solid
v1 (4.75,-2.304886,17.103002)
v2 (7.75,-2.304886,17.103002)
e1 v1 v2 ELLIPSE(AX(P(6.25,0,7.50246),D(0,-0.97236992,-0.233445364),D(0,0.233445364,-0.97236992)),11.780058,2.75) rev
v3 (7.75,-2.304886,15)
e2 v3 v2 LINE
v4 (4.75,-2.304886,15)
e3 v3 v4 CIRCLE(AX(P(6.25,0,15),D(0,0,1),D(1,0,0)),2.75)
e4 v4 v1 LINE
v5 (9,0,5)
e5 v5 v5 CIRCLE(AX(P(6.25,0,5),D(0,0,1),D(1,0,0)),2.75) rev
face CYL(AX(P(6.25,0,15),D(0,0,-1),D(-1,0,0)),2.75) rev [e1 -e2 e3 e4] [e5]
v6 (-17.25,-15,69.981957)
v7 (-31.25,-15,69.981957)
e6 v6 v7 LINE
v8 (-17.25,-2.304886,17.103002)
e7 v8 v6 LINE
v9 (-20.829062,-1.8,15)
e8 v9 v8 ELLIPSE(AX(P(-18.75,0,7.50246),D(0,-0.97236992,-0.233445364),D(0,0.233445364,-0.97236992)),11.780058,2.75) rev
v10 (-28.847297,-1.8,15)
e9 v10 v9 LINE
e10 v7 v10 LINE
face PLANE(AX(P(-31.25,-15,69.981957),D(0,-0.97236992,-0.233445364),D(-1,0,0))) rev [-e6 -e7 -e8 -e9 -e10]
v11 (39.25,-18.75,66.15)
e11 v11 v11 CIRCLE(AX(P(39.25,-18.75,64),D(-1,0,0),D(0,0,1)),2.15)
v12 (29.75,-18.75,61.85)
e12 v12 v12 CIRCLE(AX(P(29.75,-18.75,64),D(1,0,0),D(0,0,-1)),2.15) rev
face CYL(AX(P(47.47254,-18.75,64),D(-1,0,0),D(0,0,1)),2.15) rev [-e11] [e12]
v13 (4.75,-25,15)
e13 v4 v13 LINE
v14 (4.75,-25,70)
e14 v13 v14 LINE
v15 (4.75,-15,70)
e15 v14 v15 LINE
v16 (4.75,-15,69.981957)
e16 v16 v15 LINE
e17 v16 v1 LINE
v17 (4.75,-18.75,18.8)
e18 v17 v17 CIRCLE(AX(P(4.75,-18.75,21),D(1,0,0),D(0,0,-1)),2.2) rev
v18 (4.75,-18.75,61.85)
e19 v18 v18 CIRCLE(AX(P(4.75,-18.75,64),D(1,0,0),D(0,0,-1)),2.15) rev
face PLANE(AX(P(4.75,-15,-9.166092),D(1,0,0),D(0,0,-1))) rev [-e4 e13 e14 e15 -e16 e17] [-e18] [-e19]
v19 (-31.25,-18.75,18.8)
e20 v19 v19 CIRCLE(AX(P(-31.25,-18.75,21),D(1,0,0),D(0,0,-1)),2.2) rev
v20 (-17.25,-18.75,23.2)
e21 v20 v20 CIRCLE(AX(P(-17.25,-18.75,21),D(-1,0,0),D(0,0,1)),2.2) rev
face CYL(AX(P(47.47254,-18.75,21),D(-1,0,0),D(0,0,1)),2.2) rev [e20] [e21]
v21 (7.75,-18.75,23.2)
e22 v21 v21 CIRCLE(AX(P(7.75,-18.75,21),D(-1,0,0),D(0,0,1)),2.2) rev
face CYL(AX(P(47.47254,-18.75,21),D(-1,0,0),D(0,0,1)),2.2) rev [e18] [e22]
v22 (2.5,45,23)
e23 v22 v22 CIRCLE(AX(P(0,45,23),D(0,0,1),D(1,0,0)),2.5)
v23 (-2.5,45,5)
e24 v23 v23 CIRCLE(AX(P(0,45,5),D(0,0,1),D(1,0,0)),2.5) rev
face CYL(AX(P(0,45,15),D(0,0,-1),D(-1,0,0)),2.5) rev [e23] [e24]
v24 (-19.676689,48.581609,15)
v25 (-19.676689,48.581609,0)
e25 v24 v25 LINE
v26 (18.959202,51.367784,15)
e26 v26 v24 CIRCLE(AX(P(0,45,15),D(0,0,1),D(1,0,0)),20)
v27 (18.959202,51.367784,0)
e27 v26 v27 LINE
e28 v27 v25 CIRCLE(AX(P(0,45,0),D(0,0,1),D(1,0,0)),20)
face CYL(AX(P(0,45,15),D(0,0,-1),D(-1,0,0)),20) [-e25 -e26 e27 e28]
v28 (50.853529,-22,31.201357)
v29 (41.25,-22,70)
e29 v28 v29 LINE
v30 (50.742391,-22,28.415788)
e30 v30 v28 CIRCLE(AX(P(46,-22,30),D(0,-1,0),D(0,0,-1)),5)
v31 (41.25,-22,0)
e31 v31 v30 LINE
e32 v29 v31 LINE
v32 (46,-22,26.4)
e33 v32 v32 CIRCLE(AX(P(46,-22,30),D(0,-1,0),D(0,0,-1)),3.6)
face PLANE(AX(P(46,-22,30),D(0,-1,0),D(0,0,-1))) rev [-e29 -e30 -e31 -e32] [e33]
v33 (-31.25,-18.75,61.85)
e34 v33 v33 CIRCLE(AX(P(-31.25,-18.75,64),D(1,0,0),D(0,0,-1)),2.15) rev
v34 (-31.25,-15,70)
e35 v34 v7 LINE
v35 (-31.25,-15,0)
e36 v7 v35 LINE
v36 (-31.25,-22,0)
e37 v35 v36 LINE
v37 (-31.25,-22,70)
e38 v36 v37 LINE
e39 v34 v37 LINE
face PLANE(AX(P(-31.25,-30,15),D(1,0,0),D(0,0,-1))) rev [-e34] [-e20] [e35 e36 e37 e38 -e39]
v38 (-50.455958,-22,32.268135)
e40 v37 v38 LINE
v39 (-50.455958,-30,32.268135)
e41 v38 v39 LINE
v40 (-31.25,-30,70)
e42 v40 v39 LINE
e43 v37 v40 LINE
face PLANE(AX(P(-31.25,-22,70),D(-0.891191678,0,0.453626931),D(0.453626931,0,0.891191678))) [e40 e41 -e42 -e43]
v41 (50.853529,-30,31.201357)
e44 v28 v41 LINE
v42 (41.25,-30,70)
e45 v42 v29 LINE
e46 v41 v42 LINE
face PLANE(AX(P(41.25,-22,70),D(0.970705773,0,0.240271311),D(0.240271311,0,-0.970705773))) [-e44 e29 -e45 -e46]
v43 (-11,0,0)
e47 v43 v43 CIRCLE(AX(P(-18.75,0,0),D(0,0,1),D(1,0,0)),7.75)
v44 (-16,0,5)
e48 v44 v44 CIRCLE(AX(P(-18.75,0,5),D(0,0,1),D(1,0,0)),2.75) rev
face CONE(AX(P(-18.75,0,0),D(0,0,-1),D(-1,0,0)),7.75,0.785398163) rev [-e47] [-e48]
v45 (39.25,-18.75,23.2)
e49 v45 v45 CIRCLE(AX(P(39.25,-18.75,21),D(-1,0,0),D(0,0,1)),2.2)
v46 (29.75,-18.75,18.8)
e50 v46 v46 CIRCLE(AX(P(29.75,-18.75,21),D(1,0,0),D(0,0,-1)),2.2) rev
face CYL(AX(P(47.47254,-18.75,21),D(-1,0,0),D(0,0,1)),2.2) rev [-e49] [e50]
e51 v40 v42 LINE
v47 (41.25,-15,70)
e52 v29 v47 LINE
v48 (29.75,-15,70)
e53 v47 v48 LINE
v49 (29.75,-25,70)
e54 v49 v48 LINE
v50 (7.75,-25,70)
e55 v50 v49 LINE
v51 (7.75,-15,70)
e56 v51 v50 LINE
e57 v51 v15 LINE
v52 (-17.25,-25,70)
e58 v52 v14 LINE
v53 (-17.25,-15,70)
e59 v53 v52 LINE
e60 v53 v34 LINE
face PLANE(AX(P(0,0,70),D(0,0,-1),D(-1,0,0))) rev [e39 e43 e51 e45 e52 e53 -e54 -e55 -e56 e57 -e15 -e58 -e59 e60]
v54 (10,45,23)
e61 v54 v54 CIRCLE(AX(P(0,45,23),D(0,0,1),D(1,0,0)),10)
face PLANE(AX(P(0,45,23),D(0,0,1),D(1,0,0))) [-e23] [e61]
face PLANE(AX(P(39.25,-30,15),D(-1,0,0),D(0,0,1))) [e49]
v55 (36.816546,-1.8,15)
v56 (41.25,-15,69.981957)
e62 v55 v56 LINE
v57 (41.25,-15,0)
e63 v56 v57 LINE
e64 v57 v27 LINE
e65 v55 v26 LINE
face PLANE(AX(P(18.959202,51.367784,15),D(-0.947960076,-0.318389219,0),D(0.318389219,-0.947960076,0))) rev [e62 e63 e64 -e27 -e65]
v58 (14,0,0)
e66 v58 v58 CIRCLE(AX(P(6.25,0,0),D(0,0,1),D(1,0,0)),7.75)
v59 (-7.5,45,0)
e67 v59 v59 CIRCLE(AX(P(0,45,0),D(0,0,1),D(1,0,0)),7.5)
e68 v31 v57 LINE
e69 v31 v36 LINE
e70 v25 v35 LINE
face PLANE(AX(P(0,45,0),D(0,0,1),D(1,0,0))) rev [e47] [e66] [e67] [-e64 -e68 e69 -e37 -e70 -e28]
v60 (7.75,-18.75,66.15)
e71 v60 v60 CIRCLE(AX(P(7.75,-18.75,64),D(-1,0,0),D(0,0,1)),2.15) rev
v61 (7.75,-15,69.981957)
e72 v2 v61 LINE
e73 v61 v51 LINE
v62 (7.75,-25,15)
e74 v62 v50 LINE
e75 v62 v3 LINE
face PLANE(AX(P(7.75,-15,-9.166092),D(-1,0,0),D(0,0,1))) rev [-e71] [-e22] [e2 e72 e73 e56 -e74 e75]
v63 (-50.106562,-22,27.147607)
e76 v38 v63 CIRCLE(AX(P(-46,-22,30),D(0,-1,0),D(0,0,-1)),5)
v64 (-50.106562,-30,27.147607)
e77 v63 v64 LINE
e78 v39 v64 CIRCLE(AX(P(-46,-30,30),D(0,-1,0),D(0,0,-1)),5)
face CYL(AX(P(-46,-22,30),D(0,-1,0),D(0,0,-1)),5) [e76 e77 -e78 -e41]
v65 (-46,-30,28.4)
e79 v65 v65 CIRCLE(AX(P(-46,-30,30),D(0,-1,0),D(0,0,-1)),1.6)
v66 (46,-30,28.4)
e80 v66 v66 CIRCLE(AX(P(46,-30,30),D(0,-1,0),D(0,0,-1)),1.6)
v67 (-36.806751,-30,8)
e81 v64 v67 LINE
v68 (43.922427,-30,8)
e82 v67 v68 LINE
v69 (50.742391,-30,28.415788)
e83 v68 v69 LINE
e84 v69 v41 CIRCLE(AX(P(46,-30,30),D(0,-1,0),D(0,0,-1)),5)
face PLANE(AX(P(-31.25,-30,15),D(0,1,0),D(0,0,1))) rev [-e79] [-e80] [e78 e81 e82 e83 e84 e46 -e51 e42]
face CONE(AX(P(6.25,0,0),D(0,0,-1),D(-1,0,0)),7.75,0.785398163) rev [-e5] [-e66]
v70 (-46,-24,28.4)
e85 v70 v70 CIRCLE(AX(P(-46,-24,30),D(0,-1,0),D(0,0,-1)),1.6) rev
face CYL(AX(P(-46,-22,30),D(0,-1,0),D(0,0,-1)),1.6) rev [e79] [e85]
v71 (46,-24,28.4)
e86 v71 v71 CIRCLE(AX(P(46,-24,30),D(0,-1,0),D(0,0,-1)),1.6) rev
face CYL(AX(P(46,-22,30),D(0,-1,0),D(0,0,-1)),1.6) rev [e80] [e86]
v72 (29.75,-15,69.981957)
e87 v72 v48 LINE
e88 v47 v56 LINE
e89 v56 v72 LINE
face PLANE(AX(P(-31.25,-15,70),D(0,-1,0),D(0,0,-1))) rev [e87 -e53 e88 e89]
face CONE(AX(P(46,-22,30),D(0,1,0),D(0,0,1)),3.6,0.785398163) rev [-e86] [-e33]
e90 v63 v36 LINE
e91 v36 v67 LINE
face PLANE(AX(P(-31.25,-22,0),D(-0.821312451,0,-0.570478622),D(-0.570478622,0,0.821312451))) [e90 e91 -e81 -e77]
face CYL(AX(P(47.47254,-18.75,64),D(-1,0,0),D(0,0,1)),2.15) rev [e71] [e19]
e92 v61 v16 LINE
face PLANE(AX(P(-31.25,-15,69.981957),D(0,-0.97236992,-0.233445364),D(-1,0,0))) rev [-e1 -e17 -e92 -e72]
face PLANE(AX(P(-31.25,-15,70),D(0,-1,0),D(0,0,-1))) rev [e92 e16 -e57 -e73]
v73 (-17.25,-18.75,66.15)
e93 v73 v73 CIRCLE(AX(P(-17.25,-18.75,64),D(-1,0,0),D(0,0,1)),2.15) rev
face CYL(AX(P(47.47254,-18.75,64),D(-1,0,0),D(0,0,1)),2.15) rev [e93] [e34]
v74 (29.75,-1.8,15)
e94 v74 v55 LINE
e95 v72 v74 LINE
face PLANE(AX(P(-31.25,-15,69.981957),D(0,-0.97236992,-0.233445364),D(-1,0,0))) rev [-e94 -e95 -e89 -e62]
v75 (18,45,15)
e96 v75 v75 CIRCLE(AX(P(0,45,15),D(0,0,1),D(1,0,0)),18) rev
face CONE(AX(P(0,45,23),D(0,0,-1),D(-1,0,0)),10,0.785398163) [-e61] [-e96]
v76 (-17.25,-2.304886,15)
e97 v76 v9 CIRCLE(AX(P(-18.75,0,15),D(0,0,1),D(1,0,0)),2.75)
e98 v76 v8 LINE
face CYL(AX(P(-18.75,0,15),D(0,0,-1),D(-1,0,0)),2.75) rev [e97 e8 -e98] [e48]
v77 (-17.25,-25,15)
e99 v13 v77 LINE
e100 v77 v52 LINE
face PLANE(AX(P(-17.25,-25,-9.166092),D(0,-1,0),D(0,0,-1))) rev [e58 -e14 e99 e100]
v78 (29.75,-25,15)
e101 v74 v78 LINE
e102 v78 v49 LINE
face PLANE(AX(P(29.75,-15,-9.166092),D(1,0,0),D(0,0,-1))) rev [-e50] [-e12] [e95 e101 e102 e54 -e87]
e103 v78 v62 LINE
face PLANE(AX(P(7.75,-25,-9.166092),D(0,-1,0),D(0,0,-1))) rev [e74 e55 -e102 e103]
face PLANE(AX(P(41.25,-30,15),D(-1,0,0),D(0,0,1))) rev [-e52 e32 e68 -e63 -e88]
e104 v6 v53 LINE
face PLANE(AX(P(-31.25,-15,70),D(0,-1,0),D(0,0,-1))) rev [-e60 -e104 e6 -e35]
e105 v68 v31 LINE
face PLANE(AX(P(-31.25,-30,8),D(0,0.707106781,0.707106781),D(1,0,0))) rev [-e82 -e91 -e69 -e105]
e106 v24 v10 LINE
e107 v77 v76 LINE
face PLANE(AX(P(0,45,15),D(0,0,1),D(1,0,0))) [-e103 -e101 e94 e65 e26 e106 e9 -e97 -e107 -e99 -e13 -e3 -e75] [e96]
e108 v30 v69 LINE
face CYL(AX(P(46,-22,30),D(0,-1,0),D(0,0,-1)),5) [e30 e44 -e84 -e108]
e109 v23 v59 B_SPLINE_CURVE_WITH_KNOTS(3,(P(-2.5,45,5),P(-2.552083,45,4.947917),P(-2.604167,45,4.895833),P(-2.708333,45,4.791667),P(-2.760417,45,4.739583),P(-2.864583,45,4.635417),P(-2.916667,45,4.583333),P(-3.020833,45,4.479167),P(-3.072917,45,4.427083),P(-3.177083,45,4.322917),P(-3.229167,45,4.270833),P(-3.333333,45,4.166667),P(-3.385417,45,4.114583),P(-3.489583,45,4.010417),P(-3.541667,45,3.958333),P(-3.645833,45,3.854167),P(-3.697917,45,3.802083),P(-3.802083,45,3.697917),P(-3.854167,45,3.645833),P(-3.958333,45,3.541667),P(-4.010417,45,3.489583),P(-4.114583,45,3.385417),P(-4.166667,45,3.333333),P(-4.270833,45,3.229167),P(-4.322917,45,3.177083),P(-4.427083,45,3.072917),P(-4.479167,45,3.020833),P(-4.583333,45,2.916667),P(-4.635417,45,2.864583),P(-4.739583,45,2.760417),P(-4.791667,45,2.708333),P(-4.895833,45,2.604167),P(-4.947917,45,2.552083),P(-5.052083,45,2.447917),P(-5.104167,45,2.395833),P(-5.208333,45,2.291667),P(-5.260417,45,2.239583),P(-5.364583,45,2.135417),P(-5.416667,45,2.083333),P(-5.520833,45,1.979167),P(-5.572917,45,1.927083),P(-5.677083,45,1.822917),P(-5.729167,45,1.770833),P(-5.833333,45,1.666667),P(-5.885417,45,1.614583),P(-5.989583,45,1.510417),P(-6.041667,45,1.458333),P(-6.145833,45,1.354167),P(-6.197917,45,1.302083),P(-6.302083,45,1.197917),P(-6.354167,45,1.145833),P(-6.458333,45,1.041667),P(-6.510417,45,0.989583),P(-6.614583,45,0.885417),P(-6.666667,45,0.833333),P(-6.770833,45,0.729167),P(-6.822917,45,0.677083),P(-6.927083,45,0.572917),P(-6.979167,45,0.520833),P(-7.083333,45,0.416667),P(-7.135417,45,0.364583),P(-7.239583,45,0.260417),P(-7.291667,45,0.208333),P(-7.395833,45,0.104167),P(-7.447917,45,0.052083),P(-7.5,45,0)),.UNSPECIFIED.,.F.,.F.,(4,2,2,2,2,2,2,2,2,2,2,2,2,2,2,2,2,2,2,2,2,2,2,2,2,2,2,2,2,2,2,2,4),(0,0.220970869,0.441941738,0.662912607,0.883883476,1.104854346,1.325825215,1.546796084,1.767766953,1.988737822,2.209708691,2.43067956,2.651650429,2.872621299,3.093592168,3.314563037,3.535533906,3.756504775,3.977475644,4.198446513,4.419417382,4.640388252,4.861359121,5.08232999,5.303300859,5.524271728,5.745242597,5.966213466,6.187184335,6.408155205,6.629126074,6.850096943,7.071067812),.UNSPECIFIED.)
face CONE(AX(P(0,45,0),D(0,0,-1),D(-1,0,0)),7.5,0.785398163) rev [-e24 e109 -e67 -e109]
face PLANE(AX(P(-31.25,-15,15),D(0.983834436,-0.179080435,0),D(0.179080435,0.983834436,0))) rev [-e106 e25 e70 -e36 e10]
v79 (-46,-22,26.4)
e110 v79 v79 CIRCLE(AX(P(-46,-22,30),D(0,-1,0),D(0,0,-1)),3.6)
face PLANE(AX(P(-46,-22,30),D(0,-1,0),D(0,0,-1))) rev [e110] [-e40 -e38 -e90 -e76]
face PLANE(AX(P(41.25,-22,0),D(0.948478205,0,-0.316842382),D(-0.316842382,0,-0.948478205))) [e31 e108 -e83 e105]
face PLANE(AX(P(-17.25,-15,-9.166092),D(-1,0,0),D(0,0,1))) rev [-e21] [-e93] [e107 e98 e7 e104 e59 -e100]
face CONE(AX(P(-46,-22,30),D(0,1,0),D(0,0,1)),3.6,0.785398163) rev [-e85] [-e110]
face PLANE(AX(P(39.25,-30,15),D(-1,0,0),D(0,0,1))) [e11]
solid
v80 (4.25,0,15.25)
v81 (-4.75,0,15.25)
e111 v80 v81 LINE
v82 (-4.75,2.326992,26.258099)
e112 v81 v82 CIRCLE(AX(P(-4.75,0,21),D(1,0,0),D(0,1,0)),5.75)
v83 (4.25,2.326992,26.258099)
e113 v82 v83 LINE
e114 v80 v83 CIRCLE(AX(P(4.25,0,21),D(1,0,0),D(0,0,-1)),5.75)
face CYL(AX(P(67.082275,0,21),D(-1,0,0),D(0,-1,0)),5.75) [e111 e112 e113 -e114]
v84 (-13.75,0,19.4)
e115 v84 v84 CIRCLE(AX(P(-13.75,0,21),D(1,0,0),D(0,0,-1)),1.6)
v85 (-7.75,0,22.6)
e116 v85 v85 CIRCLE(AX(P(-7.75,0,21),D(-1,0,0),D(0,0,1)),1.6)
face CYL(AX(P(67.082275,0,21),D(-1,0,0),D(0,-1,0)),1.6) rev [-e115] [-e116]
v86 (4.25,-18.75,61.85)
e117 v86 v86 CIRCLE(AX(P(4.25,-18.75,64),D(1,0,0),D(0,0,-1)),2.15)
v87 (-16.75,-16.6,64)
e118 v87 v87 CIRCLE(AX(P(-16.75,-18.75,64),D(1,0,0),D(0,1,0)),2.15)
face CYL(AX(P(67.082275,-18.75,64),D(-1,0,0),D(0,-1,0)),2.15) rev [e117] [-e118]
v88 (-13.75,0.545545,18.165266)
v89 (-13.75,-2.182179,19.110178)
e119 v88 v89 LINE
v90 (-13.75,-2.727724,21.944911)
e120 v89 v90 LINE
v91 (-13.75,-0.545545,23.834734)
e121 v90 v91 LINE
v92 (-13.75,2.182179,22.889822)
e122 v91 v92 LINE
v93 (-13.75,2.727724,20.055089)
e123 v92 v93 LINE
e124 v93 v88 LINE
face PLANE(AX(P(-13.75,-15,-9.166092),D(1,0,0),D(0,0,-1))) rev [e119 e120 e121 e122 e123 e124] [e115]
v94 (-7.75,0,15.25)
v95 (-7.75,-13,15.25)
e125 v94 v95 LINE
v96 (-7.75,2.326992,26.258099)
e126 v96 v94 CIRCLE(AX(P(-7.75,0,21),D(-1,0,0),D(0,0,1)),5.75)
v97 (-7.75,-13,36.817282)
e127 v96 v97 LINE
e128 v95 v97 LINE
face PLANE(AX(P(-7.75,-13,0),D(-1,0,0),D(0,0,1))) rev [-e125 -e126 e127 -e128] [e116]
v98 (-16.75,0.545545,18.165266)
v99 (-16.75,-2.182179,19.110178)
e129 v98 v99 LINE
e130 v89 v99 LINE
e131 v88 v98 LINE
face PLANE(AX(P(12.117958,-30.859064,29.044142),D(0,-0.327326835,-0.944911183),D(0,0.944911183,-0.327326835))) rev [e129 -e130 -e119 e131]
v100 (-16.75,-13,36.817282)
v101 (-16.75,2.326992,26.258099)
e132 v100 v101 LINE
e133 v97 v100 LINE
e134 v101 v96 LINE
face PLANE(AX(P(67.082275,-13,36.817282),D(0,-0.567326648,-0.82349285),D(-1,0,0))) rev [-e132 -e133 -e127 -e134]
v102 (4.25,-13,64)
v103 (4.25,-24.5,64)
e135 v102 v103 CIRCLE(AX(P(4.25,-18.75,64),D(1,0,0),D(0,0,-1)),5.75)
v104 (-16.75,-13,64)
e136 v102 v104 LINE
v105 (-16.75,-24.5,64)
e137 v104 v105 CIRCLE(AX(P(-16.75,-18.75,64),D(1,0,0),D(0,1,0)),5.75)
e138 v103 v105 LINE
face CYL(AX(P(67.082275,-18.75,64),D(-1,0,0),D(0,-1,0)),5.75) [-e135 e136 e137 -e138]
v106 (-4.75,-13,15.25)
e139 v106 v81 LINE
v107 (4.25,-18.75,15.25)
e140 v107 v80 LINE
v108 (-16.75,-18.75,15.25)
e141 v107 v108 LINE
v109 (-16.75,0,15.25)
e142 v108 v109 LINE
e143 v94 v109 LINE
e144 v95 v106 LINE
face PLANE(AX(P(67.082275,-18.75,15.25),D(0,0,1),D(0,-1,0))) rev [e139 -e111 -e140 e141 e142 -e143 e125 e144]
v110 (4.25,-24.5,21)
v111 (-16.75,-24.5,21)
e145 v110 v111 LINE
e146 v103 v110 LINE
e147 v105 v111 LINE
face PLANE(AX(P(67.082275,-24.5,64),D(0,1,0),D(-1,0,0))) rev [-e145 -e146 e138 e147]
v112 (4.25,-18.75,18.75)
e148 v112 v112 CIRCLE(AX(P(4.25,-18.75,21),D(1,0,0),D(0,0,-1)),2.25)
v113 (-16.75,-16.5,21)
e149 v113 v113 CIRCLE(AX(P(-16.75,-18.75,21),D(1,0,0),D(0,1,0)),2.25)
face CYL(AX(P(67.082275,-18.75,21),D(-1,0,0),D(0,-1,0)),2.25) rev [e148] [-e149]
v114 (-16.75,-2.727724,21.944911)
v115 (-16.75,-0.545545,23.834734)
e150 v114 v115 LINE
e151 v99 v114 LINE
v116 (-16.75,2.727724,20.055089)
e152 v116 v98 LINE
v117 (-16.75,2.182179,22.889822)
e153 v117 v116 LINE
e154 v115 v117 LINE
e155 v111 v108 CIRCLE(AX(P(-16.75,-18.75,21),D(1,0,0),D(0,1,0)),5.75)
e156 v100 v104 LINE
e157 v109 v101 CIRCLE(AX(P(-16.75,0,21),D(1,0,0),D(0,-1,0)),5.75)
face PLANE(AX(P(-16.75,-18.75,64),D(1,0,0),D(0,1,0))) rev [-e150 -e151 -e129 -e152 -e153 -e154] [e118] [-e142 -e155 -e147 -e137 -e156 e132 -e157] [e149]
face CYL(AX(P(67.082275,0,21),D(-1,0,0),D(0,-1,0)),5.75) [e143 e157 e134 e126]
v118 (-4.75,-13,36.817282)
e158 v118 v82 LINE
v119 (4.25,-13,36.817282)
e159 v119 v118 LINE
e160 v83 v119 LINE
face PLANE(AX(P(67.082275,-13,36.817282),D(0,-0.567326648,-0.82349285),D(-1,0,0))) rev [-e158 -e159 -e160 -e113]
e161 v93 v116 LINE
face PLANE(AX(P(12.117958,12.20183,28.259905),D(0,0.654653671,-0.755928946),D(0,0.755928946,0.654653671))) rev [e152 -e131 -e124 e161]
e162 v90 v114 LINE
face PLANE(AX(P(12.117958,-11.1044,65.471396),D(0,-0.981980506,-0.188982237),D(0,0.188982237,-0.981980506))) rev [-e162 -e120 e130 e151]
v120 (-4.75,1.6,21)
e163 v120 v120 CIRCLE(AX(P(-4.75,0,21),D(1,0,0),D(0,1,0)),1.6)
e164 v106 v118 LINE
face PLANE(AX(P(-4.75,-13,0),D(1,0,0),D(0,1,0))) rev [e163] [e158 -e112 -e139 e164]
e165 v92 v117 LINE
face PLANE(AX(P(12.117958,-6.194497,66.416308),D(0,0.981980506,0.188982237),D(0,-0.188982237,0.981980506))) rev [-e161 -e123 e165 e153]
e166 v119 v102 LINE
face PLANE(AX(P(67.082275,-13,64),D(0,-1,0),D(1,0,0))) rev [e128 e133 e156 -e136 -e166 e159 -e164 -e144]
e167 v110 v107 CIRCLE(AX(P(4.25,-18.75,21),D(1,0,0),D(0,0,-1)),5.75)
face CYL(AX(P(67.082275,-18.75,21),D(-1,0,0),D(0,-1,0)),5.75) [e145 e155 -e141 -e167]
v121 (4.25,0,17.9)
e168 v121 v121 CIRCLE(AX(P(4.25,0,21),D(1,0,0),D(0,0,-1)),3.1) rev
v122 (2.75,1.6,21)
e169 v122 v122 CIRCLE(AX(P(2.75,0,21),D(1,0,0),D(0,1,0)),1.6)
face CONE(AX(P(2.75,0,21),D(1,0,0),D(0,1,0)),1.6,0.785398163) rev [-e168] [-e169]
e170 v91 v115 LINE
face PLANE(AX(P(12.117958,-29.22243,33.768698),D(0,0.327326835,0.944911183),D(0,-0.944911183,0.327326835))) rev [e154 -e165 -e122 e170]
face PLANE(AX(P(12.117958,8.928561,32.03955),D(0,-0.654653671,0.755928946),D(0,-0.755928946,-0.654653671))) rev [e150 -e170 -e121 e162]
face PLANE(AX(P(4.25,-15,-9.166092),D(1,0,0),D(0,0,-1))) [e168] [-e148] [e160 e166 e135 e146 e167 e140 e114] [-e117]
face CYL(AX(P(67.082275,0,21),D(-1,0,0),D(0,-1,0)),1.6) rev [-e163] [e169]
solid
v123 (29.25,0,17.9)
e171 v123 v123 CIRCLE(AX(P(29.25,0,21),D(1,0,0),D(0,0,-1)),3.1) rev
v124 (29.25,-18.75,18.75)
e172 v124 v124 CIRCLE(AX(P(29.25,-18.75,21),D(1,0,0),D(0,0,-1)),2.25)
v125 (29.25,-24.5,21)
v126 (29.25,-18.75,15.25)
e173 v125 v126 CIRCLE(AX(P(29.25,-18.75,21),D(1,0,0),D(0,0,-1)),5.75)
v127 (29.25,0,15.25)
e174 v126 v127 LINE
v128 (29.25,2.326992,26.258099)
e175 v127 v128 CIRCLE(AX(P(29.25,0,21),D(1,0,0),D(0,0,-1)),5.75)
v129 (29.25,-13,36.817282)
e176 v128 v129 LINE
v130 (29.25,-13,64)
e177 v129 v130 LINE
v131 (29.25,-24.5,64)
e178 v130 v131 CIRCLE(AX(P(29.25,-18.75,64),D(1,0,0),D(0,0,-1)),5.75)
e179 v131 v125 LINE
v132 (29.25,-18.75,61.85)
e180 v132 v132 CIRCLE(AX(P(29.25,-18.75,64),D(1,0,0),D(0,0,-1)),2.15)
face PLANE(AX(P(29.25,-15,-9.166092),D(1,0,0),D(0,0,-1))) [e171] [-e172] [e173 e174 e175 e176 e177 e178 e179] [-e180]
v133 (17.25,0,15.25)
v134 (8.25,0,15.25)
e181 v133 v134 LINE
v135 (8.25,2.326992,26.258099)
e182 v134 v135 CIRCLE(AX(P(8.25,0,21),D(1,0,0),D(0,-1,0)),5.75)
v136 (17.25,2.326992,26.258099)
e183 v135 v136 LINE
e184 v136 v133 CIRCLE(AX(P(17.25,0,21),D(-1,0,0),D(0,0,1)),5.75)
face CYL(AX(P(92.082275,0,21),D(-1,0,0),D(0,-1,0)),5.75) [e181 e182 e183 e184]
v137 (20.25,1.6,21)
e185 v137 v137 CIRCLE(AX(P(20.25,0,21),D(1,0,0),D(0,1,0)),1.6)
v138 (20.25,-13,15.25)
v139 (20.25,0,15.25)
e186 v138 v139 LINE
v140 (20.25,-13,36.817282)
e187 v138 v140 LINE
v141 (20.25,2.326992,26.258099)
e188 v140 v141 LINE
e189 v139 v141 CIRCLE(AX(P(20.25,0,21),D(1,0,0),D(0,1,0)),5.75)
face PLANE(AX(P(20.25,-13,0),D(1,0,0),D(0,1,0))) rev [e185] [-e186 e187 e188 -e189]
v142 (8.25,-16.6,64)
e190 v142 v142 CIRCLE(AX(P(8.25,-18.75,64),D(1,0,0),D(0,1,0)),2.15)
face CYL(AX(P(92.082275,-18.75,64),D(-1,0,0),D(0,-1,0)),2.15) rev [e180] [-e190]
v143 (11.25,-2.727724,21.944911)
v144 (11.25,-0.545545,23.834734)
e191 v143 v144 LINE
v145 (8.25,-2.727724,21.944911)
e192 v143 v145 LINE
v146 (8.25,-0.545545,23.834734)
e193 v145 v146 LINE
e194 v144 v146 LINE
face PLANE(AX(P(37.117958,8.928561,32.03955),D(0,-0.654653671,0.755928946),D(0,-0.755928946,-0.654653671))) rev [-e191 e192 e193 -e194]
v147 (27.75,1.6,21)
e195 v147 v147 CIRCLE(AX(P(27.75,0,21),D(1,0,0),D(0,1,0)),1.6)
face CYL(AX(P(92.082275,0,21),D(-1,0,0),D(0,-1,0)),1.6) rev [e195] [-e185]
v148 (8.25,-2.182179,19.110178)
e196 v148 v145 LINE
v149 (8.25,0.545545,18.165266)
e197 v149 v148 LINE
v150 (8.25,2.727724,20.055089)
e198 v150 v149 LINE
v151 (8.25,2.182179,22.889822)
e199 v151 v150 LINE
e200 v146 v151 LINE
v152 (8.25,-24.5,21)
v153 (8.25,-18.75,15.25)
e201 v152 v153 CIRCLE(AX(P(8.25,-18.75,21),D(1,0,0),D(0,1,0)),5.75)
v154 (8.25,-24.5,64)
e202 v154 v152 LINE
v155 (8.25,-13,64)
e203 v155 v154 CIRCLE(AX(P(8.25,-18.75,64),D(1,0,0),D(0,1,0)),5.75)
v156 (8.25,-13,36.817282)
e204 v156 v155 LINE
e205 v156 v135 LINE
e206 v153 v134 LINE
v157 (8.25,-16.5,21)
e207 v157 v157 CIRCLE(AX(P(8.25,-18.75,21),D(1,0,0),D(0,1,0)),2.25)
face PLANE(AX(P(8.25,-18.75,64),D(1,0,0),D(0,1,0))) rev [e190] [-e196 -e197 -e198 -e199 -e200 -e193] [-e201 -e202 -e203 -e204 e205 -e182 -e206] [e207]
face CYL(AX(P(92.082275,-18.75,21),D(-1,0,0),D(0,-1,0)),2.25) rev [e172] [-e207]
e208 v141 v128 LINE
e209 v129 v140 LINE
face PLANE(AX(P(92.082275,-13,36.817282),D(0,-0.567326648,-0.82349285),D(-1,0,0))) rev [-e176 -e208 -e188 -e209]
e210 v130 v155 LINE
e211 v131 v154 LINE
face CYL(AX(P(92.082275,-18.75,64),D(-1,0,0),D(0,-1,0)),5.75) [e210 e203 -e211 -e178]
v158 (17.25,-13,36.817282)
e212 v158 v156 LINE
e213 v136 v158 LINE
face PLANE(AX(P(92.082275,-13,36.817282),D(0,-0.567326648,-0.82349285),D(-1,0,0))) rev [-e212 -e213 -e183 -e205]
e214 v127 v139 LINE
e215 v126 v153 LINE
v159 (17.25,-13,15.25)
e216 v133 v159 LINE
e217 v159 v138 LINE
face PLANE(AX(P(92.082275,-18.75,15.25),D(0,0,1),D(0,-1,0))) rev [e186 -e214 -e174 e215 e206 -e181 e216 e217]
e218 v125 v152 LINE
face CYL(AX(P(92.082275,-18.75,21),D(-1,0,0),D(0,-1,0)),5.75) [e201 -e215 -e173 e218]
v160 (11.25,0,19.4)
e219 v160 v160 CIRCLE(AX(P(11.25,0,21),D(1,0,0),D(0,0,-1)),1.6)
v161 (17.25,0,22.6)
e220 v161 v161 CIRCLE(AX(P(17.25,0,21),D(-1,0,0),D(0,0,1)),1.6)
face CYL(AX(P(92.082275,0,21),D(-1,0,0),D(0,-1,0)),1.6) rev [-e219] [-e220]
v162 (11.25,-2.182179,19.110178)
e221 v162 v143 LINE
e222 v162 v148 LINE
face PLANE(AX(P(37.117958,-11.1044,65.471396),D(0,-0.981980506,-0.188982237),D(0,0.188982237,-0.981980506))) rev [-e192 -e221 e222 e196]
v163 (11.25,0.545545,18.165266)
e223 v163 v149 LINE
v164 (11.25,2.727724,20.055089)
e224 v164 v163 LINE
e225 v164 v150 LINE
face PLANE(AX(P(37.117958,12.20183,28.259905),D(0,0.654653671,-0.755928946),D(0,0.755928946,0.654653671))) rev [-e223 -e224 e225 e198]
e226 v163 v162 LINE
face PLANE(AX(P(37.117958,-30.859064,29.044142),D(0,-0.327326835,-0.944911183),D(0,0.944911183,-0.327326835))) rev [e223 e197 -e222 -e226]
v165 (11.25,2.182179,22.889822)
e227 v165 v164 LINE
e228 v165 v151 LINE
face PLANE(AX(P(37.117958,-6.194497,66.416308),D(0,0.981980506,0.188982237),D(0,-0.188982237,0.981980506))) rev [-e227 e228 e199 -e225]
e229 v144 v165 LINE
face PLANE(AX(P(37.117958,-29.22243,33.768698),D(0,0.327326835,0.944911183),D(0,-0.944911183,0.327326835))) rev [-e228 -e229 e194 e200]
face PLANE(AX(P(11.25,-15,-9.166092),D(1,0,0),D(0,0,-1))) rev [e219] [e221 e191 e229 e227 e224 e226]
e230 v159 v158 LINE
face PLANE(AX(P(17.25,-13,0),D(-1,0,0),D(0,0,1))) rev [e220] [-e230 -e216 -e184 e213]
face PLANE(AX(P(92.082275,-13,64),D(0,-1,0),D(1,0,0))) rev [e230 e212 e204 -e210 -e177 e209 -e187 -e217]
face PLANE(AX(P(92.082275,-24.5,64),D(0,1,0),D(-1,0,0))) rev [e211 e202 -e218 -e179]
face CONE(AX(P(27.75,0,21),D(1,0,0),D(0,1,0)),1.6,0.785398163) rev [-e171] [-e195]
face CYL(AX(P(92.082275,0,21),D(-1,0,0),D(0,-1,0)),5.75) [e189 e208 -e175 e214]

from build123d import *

# Parameters (mm, degrees)
SKETCH2_R               = 2.75
SKETCH2_R_2             = 2.5
BOSS_EXTRUDE1_DEPTH     = 15
SKETCH8_W               = 72.5
SKETCH8_H               = 15
BOSS_EXTRUDE4_DEPTH     = 55
SKETCH9_W               = 22
SKETCH9_H               = 10
CUT_EXTRUDE3_DEPTH      = 55
CUT_EXTRUDE4_START      = -72.5
SKETCH10_R              = 2.15
SKETCH10_R_2            = 2.2
CUT_EXTRUDE4_DEPTH      = 70.5
BOSS_EXTRUDE5_START     = 0.5
SKETCH11_R              = 1.6
SKETCH11_R_2            = 2.15
SKETCH11_R_3            = 2.25
BOSS_EXTRUDE5_DEPTH     = 21
CUT_EXTRUDE5_DEPTH      = 89.301330681
CUT_EXTRUDE5_DEPTH_BACK = 89.301330681
SKETCH12_W              = 3
SKETCH12_H              = 20.831984068
CHAMFER1_START          = -16.75
CHAMFER1_DEPTH          = 9
CHAMFER1_START_2        = -4.75
CHAMFER1_2_DEPTH        = 9
CHAMFER5_SIZE           = 1.5
CUT_EXTRUDE6_DEPTH      = 3
CHAMFER2_SIZE           = 13.2
CHAMFER2_SIZE_2         = 54.981956965
SKETCH13_R              = 1.6
BOSS_EXTRUDE6_DEPTH     = 8
SKETCH14_R              = 10
SKETCH14_R_2            = 2.5
BOSS_EXTRUDE7_DEPTH     = 8
CHAMFER3_SIZE           = 8
CHAMFER4_SIZE           = 8
CHAMFER6_SIZE           = 2
CHAMFER7_SIZE           = 5


with BuildPart() as part:
    # Sketch2 → Boss-Extrude1 (new body)
    with BuildSketch(Plane.XY):
        with BuildLine():
            Line((-31.25, -30), (41.25, -30))
            Line((41.25, -30), (41.25, -15))
            Line((41.25, -15), (18.959201516, 51.367784376))
            ThreePointArc((18.959201516, 51.367784376), (-1.438537689, 64.948198147), (-19.676688722, 48.581608709))
            Line((-19.676688722, 48.581608709), (-31.25, -15))
            Line((-31.25, -15), (-31.25, -30))
        make_face()
        with Locations((-18.75, 0)):
            Circle(SKETCH2_R, mode=Mode.SUBTRACT)
        with Locations((6.25, 0)):
            Circle(SKETCH2_R, mode=Mode.SUBTRACT)
        with Locations((0, 45)):
            Circle(SKETCH2_R_2, mode=Mode.SUBTRACT)
    extrude(amount=BOSS_EXTRUDE1_DEPTH)

    # Sketch8 → Boss-Extrude4 (add)
    with BuildSketch(Plane.XY.offset(15)):
        with Locations((5, -22.5)):
            Rectangle(SKETCH8_W, SKETCH8_H)
    extrude(amount=BOSS_EXTRUDE4_DEPTH)

    # Sketch9 → Cut-Extrude3 (cut)
    with BuildSketch(Plane.XY.offset(70)):
        with Locations((-6.25, -20)):
            Rectangle(SKETCH9_W, SKETCH9_H)
        with Locations((18.75, -20)):
            Rectangle(SKETCH9_W, SKETCH9_H)
    extrude(amount=-CUT_EXTRUDE3_DEPTH, mode=Mode.SUBTRACT)

    # Sketch10 → Cut-Extrude4 (cut)
    with BuildSketch(Plane(origin=(41.25, 0, 0), x_dir=(0, 0, -1), z_dir=(1, 0, 0)).offset(CUT_EXTRUDE4_START)):
        with Locations(Location((-64, -18.75, 0), (0, 0, 180))):
            Circle(SKETCH10_R)
        with Locations(Location((-21, -18.75, 0), (0, 0, 180))):
            Circle(SKETCH10_R_2)
    extrude(amount=CUT_EXTRUDE4_DEPTH, mode=Mode.SUBTRACT)

    # Chamfer2
    # the kernel refuses this chamfer: 54.981956965, 13.2 mm, written as the material it adds along each edge
    with BuildSketch(Plane(origin=(41.25, -15, 15), x_dir=(0, 1, 0), z_dir=(-1, 0, 0))) as chamfer2_piece_1_section:
        Polygon((CHAMFER2_SIZE, 0), (0, -CHAMFER2_SIZE_2), (0, 0), align=None)
    chamfer2_piece_1 = extrude(amount=11.5, mode=Mode.PRIVATE)
    chamfer2_piece_1 = split(chamfer2_piece_1, bisect_by=Plane(origin=(41.25, -15, 15), z_dir=(-0.9479600758233321, -0.31838921879520754, 0)), keep=Keep.TOP, mode=Mode.PRIVATE)
    add(chamfer2_piece_1)
    with BuildSketch(Plane(origin=(41.25, -15, 15), x_dir=(0, 1, 0), z_dir=(-1, 0, 0))) as chamfer2_piece_2_section:
        Polygon((CHAMFER2_SIZE, 0), (0, -CHAMFER2_SIZE_2), (0, 0), align=None)
    chamfer2_piece_2 = extrude(amount=154.306940725, mode=Mode.PRIVATE)
    chamfer2_piece_2 = chamfer2_piece_2 - Plane(origin=(6.25, 0, 15), x_dir=(1, 0, 0), z_dir=(0, 0, -1)) * Cylinder(2.75, 529, mode=Mode.PRIVATE)
    chamfer2_piece_2 = split(chamfer2_piece_2, bisect_by=Plane(origin=(4.75, -15, 15), z_dir=(1, 0, 0)), keep=Keep.TOP, mode=Mode.PRIVATE)
    chamfer2_piece_2 = split(chamfer2_piece_2, bisect_by=Plane(origin=(7.75, -15, 15), z_dir=(-1, 0, 0)), keep=Keep.TOP, mode=Mode.PRIVATE)
    add(chamfer2_piece_2)
    with BuildSketch(Plane(origin=(41.25, -15, 15), x_dir=(0, 1, 0), z_dir=(-1, 0, 0))) as chamfer2_piece_3_section:
        Polygon((CHAMFER2_SIZE, 0), (0, -CHAMFER2_SIZE_2), (0, 0), align=None)
    chamfer2_piece_3 = extrude(amount=154.306940725, mode=Mode.PRIVATE)
    chamfer2_piece_3 = split(chamfer2_piece_3, bisect_by=Plane(origin=(-28.924939328, -2.226551305, 15), z_dir=(0.9838344360889139, -0.1790804354629758, 0)), keep=Keep.TOP, mode=Mode.PRIVATE)
    chamfer2_piece_3 = split(chamfer2_piece_3, bisect_by=Plane(origin=(-31.25, -15, 15), z_dir=(1, 0, 0)), keep=Keep.TOP, mode=Mode.PRIVATE)
    chamfer2_piece_3 = chamfer2_piece_3 - Plane(origin=(-18.75, 0, 15), x_dir=(1, 0, 0), z_dir=(0, 0, -1)) * Cylinder(2.75, 529, mode=Mode.PRIVATE)
    chamfer2_piece_3 = split(chamfer2_piece_3, bisect_by=Plane(origin=(-17.25, -15, 15), z_dir=(-1, 0, 0)), keep=Keep.TOP, mode=Mode.PRIVATE)
    add(chamfer2_piece_3)
    with BuildSketch(Plane(origin=(150.556940725, -15, 15), x_dir=(0, 1, 0), z_dir=(-1, 0, 0))) as chamfer2_piece_4_section:
        Polygon((CHAMFER2_SIZE, 0), (0, -CHAMFER2_SIZE_2), (0, 0), align=None)
    chamfer2_piece_4 = extrude(amount=145.806940725, mode=Mode.PRIVATE)
    chamfer2_piece_4 = split(chamfer2_piece_4, bisect_by=Plane(origin=(52.330629818, -47.991050143, 15), z_dir=(-0.9479600758233321, -0.31838921879520754, 0)), keep=Keep.TOP, mode=Mode.PRIVATE)
    chamfer2_piece_4 = split(chamfer2_piece_4, bisect_by=Plane(origin=(41.25, -15, 15), z_dir=(-1, 0, 0)), keep=Keep.TOP, mode=Mode.PRIVATE)
    chamfer2_piece_4 = split(chamfer2_piece_4, bisect_by=Plane(origin=(29.75, -15, 15), z_dir=(1, 0, 0)), keep=Keep.TOP, mode=Mode.PRIVATE)
    add(chamfer2_piece_4)
    with BuildSketch(Plane(origin=(7.75, -15, 15), x_dir=(0, 1, 0), z_dir=(-1, 0, 0))) as chamfer2_piece_5_section:
        Polygon((CHAMFER2_SIZE, 0), (0, -CHAMFER2_SIZE_2), (0, 0), align=None)
    chamfer2_piece_5 = extrude(amount=3, mode=Mode.PRIVATE)
    chamfer2_piece_5 = chamfer2_piece_5 - Plane(origin=(6.25, 0, 15), x_dir=(1, 0, 0), z_dir=(0, 0, -1)) * Cylinder(2.75, 226, mode=Mode.PRIVATE)
    add(chamfer2_piece_5)
    with BuildSketch(Plane(origin=(7.75, -15, 15), x_dir=(0, 1, 0), z_dir=(-1, 0, 0))) as chamfer2_piece_6_section:
        Polygon((CHAMFER2_SIZE, 0), (0, -CHAMFER2_SIZE_2), (0, 0), align=None)
    chamfer2_piece_6 = extrude(amount=145.806940725, mode=Mode.PRIVATE)
    chamfer2_piece_6 = split(chamfer2_piece_6, bisect_by=Plane(origin=(-29.999277708, -8.12876553, 15), z_dir=(0.9838344360889139, -0.1790804354629758, 0)), keep=Keep.TOP, mode=Mode.PRIVATE)
    chamfer2_piece_6 = split(chamfer2_piece_6, bisect_by=Plane(origin=(-31.25, -15, 15), z_dir=(1, 0, 0)), keep=Keep.TOP, mode=Mode.PRIVATE)
    chamfer2_piece_6 = chamfer2_piece_6 - Plane(origin=(-18.75, 0, 15), x_dir=(1, 0, 0), z_dir=(0, 0, -1)) * Cylinder(2.75, 512, mode=Mode.PRIVATE)
    chamfer2_piece_6 = split(chamfer2_piece_6, bisect_by=Plane(origin=(-17.25, -15, 15), z_dir=(-1, 0, 0)), keep=Keep.TOP, mode=Mode.PRIVATE)
    add(chamfer2_piece_6)
    with BuildSketch(Plane(origin=(125.556940725, -15, 15), x_dir=(0, 1, 0), z_dir=(-1, 0, 0))) as chamfer2_piece_7_section:
        Polygon((CHAMFER2_SIZE, 0), (0, -CHAMFER2_SIZE_2), (0, 0), align=None)
    chamfer2_piece_7 = extrude(amount=156.806940725, mode=Mode.PRIVATE)
    chamfer2_piece_7 = split(chamfer2_piece_7, bisect_by=Plane(origin=(49.796337452, -40.445543443, 15), z_dir=(-0.9479600758233321, -0.31838921879520754, 0)), keep=Keep.TOP, mode=Mode.PRIVATE)
    chamfer2_piece_7 = split(chamfer2_piece_7, bisect_by=Plane(origin=(41.25, -15, 15), z_dir=(-1, 0, 0)), keep=Keep.TOP, mode=Mode.PRIVATE)
    chamfer2_piece_7 = split(chamfer2_piece_7, bisect_by=Plane(origin=(29.75, -15, 15), z_dir=(1, 0, 0)), keep=Keep.TOP, mode=Mode.PRIVATE)
    add(chamfer2_piece_7)
    with BuildSketch(Plane(origin=(125.556940725, -15, 15), x_dir=(0, 1, 0), z_dir=(-1, 0, 0))) as chamfer2_piece_8_section:
        Polygon((CHAMFER2_SIZE, 0), (0, -CHAMFER2_SIZE_2), (0, 0), align=None)
    chamfer2_piece_8 = extrude(amount=156.806940725, mode=Mode.PRIVATE)
    chamfer2_piece_8 = chamfer2_piece_8 - Plane(origin=(6.25, 0, 15), x_dir=(1, 0, 0), z_dir=(0, 0, -1)) * Cylinder(2.75, 534, mode=Mode.PRIVATE)
    chamfer2_piece_8 = split(chamfer2_piece_8, bisect_by=Plane(origin=(4.75, -15, 15), z_dir=(1, 0, 0)), keep=Keep.TOP, mode=Mode.PRIVATE)
    chamfer2_piece_8 = split(chamfer2_piece_8, bisect_by=Plane(origin=(7.75, -15, 15), z_dir=(-1, 0, 0)), keep=Keep.TOP, mode=Mode.PRIVATE)
    add(chamfer2_piece_8)
    with BuildSketch(Plane(origin=(-17.25, -15, 15), x_dir=(0, 1, 0), z_dir=(-1, 0, 0))) as chamfer2_piece_9_section:
        Polygon((CHAMFER2_SIZE, 0), (0, -CHAMFER2_SIZE_2), (0, 0), align=None)
    chamfer2_piece_9 = extrude(amount=14, mode=Mode.PRIVATE)
    chamfer2_piece_9 = split(chamfer2_piece_9, bisect_by=Plane(origin=(-30.801022767, -12.533403011, 15), z_dir=(0.9838344360889139, -0.1790804354629758, 0)), keep=Keep.TOP, mode=Mode.PRIVATE)
    chamfer2_piece_9 = chamfer2_piece_9 - Plane(origin=(-18.75, 0, 15), x_dir=(1, 0, 0), z_dir=(0, 0, -1)) * Cylinder(2.75, 248, mode=Mode.PRIVATE)
    add(chamfer2_piece_9)

    # Sketch13 → Boss-Extrude6 (add)
    # profile 1 of 2: a face of its own
    with BuildSketch(Plane.XZ.offset(30)):
        with BuildLine():
            Line((41.25, 70), (41.25, 0))
            Line((41.25, 0), (50.742391023, 28.415788088))
            ThreePointArc((50.742391023, 28.415788088), (50.996025174, 29.800669968), (50.853528864, 31.201356553))
            Line((50.853528864, 31.201356553), (41.25, 70))
        make_face()
        with Locations(Location((46, 30, 0), (0, 0, 270))):
            Circle(SKETCH13_R, mode=Mode.SUBTRACT)
    # profile 2 of 2: a face of its own
    with BuildSketch(Plane.XZ.offset(30)):
        with BuildLine():
            Line((-31.25, 70), (-31.25, 0))
            Line((-31.25, 0), (-50.106562255, 27.147606891))
            ThreePointArc((-50.106562255, 27.147606891), (-50.988400656, 29.659619478), (-50.455958391, 32.268134657))
            Line((-50.455958391, 32.268134657), (-31.25, 70))
        make_face()
        with Locations(Location((-46, 30, 0), (0, 0, 270))):
            Circle(SKETCH13_R, mode=Mode.SUBTRACT)
    extrude(amount=-BOSS_EXTRUDE6_DEPTH)

    # Sketch14 → Boss-Extrude7 (add)
    with BuildSketch(Plane.XY.offset(15)):
        with Locations((0, 45)):
            Circle(SKETCH14_R)
        with Locations((0, 45)):
            Circle(SKETCH14_R_2, mode=Mode.SUBTRACT)
    extrude(amount=BOSS_EXTRUDE7_DEPTH)

    # Chamfer3
    chamfer3_edges = [part.edges().sort_by_distance(p)[0] for p in [
        (-10, 45, 15),
    ]]
    chamfer(chamfer3_edges, length=CHAMFER3_SIZE - 0.0001)  # a hair under: the kernel refuses the full size

    # Chamfer4
    chamfer4_edges = [part.edges().sort_by_distance(p)[0] for p in [
        (5, -30, 0),
    ]]
    chamfer(chamfer4_edges, length=CHAMFER4_SIZE)

    # Chamfer6
    chamfer6_edges = [part.edges().sort_by_distance(p)[0] for p in [
        (46, -22, 31.6),
        (-46, -22, 31.6),
    ]]
    chamfer(chamfer6_edges, length=CHAMFER6_SIZE)

    # Chamfer7
    chamfer7_edges = [part.edges().sort_by_distance(p)[0] for p in [
        (-21.5, 0, 0),
        (3.5, 0, 0),
        (-2.5, 45, 0),
    ]]
    chamfer(chamfer7_edges, length=CHAMFER7_SIZE)


with BuildPart() as body_2:
    # Sketch11 → Boss-Extrude5 (new body)
    with BuildSketch(Plane(origin=(-17.25, 0, 0), x_dir=(0, 0, -1), z_dir=(1, 0, 0)).offset(BOSS_EXTRUDE5_START)):
        with BuildLine():
            Line((-64, -13), (-26.75, -13))
            Line((-26.75, -13), (-26.75, 0))
            ThreePointArc((-26.75, 0), (-21, 5.75), (-15.25, 0))
            Line((-15.25, 0), (-15.25, -18.75))
            ThreePointArc((-15.25, -18.75), (-16.934136008, -22.815863992), (-21, -24.5))
            Line((-21, -24.5), (-64, -24.5))
            ThreePointArc((-64, -24.5), (-69.75, -18.75), (-64, -13))
        make_face()
        with Locations((-21, 0)):
            Circle(SKETCH11_R, mode=Mode.SUBTRACT)
        with Locations((-64, -18.75)):
            Circle(SKETCH11_R_2, mode=Mode.SUBTRACT)
        with Locations((-21, -18.75)):
            Circle(SKETCH11_R_3, mode=Mode.SUBTRACT)
    extrude(amount=BOSS_EXTRUDE5_DEPTH)

    # Sketch12 → Cut-Extrude5 (cut, two sides: drawn at the far end of the back side and taken through both)
    with BuildSketch(Plane.XY.offset(26.75).offset(-CUT_EXTRUDE5_DEPTH_BACK)):
        with Locations((-6.25, -2.584007966)):
            Rectangle(SKETCH12_W, SKETCH12_H)
    extrude(amount=CUT_EXTRUDE5_DEPTH + CUT_EXTRUDE5_DEPTH_BACK, mode=Mode.SUBTRACT)

    # Chamfer1: read off the stored shape, not the designer's step
    # Chamfer1 outline → Chamfer1 (add)
    with BuildSketch(Plane.YZ.offset(CHAMFER1_START)):
        with BuildLine():
            Line((2.326992396, 26.258099123), (-13, 36.817281538))
            Line((-13, 36.817281538), (-13, 26.75))
            Line((-13, 26.75), (0, 26.75))
            ThreePointArc((0, 26.75), (1.189207728, 26.625680846), (2.326992396, 26.258099123))
        make_face()
    extrude(amount=CHAMFER1_DEPTH)

    # Chamfer1 2 outline → Chamfer1 2 (add)
    with BuildSketch(Plane.YZ.offset(CHAMFER1_START_2)):
        with BuildLine():
            Line((2.326992396, 26.258099123), (-13, 36.817281538))
            Line((-13, 36.817281538), (-13, 26.75))
            Line((-13, 26.75), (0, 26.75))
            ThreePointArc((0, 26.75), (1.189207728, 26.625680846), (2.326992396, 26.258099123))
        make_face()
    extrude(amount=CHAMFER1_2_DEPTH)

    # Chamfer5
    chamfer5_edges = [body_2.edges().sort_by_distance(p)[0] for p in [
        (4.25, 0, 22.6),
    ]]
    chamfer(chamfer5_edges, length=CHAMFER5_SIZE)

    # Sketch15 → Cut-Extrude6 (cut)
    with BuildSketch(Plane.ZY.offset(16.75)):
        Polygon((19.110177635, -2.182178902), (21.944911183, -2.727723628), (23.834733548, -0.545544726), (22.889822365, 2.182178902), (20.055088817, 2.727723628), (18.165266452, 0.545544726), align=None)
    extrude(amount=-CUT_EXTRUDE6_DEPTH, mode=Mode.SUBTRACT)


with BuildPart() as body_3:
    # Body-Move/Copy1: copy of body 2
    add(body_2.part.moved(Location((25, 0, 0))))


solid = Compound([part.part, body_2.part, body_3.part])
